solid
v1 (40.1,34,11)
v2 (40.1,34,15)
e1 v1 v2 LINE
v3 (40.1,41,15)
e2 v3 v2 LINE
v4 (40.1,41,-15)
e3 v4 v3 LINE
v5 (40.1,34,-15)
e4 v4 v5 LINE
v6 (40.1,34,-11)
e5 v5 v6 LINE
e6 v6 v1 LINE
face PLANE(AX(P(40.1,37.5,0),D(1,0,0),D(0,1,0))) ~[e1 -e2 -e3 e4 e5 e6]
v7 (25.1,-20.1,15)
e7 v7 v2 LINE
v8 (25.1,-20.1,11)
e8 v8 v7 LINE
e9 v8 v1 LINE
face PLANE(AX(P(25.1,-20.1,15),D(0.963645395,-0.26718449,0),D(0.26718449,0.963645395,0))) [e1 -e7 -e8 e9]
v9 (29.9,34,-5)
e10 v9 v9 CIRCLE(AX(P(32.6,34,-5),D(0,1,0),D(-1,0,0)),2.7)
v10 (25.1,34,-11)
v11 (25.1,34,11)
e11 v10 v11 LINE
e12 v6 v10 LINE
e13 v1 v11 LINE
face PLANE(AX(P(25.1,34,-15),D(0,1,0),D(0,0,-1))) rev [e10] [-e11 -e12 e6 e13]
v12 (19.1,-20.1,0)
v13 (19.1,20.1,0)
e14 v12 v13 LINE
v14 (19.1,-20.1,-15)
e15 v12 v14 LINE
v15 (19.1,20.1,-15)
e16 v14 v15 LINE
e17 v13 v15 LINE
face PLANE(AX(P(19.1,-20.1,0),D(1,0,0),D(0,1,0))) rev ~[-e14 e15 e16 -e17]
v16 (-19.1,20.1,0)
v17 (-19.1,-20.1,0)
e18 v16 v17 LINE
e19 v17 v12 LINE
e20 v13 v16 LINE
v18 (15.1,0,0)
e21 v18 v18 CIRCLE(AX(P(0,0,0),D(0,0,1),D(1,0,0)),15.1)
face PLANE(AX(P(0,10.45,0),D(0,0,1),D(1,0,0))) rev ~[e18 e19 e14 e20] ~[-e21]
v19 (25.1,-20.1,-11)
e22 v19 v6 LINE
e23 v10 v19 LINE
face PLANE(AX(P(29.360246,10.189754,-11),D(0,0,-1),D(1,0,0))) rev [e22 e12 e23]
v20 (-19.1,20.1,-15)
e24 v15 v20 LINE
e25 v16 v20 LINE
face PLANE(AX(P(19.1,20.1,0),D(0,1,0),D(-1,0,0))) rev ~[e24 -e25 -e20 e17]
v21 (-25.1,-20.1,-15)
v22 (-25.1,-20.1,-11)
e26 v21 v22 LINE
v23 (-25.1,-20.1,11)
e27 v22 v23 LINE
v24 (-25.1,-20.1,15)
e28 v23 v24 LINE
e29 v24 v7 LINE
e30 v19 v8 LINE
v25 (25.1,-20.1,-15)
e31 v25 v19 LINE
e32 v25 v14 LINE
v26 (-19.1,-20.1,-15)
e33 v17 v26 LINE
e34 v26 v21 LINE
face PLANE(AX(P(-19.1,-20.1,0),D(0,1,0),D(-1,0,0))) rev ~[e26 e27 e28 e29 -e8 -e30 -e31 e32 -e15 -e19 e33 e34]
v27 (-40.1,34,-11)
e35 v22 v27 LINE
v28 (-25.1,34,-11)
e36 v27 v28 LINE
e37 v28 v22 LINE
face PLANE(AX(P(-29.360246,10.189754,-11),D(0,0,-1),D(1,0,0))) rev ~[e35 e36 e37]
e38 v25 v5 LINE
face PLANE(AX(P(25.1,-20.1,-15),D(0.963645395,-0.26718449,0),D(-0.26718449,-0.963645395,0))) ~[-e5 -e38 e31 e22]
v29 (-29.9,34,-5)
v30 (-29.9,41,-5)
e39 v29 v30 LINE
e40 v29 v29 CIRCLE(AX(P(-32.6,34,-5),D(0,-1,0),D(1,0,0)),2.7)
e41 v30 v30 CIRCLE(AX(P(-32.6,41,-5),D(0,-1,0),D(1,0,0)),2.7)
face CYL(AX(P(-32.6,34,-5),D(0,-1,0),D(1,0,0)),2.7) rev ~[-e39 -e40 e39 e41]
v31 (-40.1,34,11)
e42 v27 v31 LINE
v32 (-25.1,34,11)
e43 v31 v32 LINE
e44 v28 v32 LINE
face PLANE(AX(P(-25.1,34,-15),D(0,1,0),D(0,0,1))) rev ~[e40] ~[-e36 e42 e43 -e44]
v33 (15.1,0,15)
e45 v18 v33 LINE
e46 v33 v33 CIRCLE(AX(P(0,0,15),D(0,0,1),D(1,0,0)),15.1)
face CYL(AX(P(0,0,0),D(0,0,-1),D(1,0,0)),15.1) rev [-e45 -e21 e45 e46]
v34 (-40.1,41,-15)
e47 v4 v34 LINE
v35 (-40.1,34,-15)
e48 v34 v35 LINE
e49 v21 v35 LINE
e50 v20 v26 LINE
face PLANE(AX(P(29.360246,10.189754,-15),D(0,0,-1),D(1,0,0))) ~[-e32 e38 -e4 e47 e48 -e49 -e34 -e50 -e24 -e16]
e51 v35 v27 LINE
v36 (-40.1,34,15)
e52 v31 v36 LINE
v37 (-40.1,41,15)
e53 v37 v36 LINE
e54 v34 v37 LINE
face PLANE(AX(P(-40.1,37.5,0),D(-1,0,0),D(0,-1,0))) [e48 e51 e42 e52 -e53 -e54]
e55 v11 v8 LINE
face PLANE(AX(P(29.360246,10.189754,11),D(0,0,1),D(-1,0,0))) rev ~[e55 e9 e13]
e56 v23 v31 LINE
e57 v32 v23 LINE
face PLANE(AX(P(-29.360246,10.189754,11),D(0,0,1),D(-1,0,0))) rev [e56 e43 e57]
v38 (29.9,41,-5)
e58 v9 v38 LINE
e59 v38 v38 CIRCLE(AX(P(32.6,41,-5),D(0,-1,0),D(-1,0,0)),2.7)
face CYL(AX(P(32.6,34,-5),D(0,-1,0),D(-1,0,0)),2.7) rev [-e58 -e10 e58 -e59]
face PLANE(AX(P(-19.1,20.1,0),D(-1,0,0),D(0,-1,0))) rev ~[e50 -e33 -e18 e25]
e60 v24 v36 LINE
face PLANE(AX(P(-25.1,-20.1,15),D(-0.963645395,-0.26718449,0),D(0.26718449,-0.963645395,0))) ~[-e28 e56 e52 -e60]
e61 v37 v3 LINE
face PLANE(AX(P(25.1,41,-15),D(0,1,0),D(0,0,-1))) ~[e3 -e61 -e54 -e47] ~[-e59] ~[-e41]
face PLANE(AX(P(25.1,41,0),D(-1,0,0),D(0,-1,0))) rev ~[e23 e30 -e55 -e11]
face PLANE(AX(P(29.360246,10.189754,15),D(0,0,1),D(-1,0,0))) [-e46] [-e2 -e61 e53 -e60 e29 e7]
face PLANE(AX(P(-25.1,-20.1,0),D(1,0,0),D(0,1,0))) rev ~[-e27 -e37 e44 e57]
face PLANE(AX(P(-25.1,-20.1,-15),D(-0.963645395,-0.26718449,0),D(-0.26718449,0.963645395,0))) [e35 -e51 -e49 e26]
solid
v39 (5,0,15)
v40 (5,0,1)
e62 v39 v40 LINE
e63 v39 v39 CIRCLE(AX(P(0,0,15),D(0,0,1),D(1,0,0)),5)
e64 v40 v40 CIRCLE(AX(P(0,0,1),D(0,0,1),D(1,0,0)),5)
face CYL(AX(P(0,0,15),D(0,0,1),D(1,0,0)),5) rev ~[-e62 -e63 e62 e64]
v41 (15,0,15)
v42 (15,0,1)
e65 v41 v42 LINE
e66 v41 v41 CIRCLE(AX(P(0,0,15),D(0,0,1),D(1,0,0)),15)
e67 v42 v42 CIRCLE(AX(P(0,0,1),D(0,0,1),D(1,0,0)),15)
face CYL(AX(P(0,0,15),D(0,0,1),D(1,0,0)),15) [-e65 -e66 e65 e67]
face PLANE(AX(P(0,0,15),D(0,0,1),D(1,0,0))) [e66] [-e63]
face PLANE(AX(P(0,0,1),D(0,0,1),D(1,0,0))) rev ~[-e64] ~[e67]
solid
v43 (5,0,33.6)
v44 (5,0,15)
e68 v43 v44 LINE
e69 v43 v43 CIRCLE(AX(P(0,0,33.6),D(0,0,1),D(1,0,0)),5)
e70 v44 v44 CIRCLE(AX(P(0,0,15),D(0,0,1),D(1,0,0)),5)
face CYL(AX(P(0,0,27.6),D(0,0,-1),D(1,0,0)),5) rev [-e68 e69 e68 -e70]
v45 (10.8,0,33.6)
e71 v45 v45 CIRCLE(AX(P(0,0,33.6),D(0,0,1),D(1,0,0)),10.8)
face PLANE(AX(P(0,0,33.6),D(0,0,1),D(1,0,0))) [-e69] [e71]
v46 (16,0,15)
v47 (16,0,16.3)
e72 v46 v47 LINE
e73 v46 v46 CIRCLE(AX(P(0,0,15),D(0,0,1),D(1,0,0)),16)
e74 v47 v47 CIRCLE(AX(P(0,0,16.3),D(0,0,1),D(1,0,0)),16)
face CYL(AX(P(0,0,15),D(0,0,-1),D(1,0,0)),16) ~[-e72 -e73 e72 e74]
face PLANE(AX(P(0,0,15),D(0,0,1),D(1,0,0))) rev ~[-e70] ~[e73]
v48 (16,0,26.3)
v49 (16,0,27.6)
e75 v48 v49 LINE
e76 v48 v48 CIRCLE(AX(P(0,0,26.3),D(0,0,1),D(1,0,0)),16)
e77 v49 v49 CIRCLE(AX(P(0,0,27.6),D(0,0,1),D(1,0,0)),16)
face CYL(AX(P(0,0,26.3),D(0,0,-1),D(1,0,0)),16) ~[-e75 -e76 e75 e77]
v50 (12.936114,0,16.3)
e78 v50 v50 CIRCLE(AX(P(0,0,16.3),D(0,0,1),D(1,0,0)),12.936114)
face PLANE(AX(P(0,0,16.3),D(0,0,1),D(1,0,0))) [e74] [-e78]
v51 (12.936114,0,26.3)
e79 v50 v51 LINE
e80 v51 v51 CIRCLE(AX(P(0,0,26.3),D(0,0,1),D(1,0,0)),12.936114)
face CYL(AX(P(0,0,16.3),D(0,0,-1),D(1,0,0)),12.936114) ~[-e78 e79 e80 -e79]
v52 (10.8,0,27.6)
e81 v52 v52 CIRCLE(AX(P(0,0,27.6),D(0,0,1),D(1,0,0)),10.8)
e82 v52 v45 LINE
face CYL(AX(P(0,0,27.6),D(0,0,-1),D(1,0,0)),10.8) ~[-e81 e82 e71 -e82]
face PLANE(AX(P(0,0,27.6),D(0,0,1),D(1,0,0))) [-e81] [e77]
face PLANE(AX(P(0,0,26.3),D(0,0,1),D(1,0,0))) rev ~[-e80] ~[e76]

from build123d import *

# Parameters (mm, degrees)
F0_W              = 50.2
F0_H              = 61.1
F0_R              = 15.1
F1_DEPTH          = 15
F2_R              = 15
F2_R_2            = 5
F3_DEPTH          = 14
F5_DEPTH          = 15
F6_W              = 7
F6_H              = 30
F7_DEPTH          = 15
F8_R              = 2.7
F9_DEPTH          = 25
F11_DEPTH         = 4
F11_COPIES2_COUNT = 2
F12_R             = 16
F12_R_2           = 5
F13_DEPTH         = 1.3
F14_R             = 12.9361137745
F14_R_2           = 5
F15_DEPTH         = 10
F16_R             = 16
F16_R_2           = 5
F17_DEPTH         = 1.3
F18_R             = 10.8
F18_R_2           = 5
F19_DEPTH         = 6


# Not quite as in the source:
# - a pattern or mirror of a feature is missing from the dataset's text; its kind, count and spacing are read off the source's solid


with BuildPart() as f1:
    # F0 (on Top) → F1 (new body)
    with BuildSketch(Plane.XY):
        with Locations((0, 10.45)):
            Rectangle(F0_W, F0_H)
        Circle(F0_R, mode=Mode.SUBTRACT)
    extrude(amount=F1_DEPTH)

    # F4 (on face) → F5 (join)
    with BuildSketch(Plane(origin=(0, 0, 0), x_dir=(1, 0, 0), z_dir=(0, 0, -1))):
        Polygon((-25.1, 20.1), (-25.1, -41), (25.1, -41), (25.1, 20.1), (19.1, 20.1), (19.1, -20.1), (-19.1, -20.1), (-19.1, 20.1), align=None)
    extrude(amount=F5_DEPTH)

    # F6 (on face) → F7 (join)
    with BuildSketch(Plane(origin=(-25.1, 0, 0), x_dir=(0, -1, 0), z_dir=(-1, 0, 0))):
        with Locations((-37.5, 0)):
            Rectangle(F6_W, F6_H)
    f7 = extrude(amount=F7_DEPTH)

    # F7_copies: F7 across plane
    add(f7.mirror(Plane(origin=(0, 0, 0), x_dir=(0, 0, 1), z_dir=(1, 0, 0))))

    # F8 (on face) → F9 (cut)
    with BuildSketch(Plane.XZ.offset(-34)):
        with Locations((-32.6, -5)):
            Circle(F8_R)
    f9 = extrude(amount=-F9_DEPTH, mode=Mode.SUBTRACT)

    # F9_copies: F9 across plane
    add(f9.mirror(Plane(origin=(0, 0, 0), x_dir=(0, 0, 1), z_dir=(1, 0, 0))), mode=Mode.SUBTRACT)

    # F10 (on face) → F11 (join)
    with BuildSketch(Plane(origin=(0, 0, -15), x_dir=(1, 0, 0), z_dir=(0, 0, -1))):
        Polygon((-25.1, -34), (-25.1, 20.1), (-40.1, -34), align=None)
    f11 = extrude(amount=-F11_DEPTH)

    # F11_copies: F11 across plane
    add(f11.mirror(Plane.XY))

    # F11_copies1: F11 across plane
    add(f11.mirror(Plane(origin=(0, 0, 0), x_dir=(0, 0, 1), z_dir=(1, 0, 0))))

    # F11_copies2: F11 ×2 about axis
    f11_copies2_axis = Axis((0, 0, 0), (0, 1, 0))
    for i in range(1, F11_COPIES2_COUNT):
        add(f11.rotate(f11_copies2_axis, i * 360 / F11_COPIES2_COUNT))


with BuildPart() as f3:
    # F2 (on face) → F3 (new body)
    with BuildSketch(Plane.XY.offset(15)):
        Circle(F2_R)
        Circle(F2_R_2, mode=Mode.SUBTRACT)
    extrude(amount=-F3_DEPTH)


with BuildPart() as f13:
    # F12 (on face) → F13 (new body)
    with BuildSketch(Plane.XY.offset(15)):
        Circle(F12_R)
        Circle(F12_R_2, mode=Mode.SUBTRACT)
    extrude(amount=F13_DEPTH)

    # F14 (on face) → F15 (join)
    with BuildSketch(Plane.XY.offset(16.3)):
        Circle(F14_R)
        Circle(F14_R_2, mode=Mode.SUBTRACT)
    extrude(amount=F15_DEPTH)

    # F16 (on face) → F17 (join)
    with BuildSketch(Plane.XY.offset(26.3)):
        Circle(F16_R)
        Circle(F16_R_2, mode=Mode.SUBTRACT)
    extrude(amount=F17_DEPTH)

    # F18 (on face) → F19 (join)
    with BuildSketch(Plane.XY.offset(27.6)):
        Circle(F18_R)
        Circle(F18_R_2, mode=Mode.SUBTRACT)
    extrude(amount=F19_DEPTH)


solid = Compound([f1.part, f3.part, f13.part])
